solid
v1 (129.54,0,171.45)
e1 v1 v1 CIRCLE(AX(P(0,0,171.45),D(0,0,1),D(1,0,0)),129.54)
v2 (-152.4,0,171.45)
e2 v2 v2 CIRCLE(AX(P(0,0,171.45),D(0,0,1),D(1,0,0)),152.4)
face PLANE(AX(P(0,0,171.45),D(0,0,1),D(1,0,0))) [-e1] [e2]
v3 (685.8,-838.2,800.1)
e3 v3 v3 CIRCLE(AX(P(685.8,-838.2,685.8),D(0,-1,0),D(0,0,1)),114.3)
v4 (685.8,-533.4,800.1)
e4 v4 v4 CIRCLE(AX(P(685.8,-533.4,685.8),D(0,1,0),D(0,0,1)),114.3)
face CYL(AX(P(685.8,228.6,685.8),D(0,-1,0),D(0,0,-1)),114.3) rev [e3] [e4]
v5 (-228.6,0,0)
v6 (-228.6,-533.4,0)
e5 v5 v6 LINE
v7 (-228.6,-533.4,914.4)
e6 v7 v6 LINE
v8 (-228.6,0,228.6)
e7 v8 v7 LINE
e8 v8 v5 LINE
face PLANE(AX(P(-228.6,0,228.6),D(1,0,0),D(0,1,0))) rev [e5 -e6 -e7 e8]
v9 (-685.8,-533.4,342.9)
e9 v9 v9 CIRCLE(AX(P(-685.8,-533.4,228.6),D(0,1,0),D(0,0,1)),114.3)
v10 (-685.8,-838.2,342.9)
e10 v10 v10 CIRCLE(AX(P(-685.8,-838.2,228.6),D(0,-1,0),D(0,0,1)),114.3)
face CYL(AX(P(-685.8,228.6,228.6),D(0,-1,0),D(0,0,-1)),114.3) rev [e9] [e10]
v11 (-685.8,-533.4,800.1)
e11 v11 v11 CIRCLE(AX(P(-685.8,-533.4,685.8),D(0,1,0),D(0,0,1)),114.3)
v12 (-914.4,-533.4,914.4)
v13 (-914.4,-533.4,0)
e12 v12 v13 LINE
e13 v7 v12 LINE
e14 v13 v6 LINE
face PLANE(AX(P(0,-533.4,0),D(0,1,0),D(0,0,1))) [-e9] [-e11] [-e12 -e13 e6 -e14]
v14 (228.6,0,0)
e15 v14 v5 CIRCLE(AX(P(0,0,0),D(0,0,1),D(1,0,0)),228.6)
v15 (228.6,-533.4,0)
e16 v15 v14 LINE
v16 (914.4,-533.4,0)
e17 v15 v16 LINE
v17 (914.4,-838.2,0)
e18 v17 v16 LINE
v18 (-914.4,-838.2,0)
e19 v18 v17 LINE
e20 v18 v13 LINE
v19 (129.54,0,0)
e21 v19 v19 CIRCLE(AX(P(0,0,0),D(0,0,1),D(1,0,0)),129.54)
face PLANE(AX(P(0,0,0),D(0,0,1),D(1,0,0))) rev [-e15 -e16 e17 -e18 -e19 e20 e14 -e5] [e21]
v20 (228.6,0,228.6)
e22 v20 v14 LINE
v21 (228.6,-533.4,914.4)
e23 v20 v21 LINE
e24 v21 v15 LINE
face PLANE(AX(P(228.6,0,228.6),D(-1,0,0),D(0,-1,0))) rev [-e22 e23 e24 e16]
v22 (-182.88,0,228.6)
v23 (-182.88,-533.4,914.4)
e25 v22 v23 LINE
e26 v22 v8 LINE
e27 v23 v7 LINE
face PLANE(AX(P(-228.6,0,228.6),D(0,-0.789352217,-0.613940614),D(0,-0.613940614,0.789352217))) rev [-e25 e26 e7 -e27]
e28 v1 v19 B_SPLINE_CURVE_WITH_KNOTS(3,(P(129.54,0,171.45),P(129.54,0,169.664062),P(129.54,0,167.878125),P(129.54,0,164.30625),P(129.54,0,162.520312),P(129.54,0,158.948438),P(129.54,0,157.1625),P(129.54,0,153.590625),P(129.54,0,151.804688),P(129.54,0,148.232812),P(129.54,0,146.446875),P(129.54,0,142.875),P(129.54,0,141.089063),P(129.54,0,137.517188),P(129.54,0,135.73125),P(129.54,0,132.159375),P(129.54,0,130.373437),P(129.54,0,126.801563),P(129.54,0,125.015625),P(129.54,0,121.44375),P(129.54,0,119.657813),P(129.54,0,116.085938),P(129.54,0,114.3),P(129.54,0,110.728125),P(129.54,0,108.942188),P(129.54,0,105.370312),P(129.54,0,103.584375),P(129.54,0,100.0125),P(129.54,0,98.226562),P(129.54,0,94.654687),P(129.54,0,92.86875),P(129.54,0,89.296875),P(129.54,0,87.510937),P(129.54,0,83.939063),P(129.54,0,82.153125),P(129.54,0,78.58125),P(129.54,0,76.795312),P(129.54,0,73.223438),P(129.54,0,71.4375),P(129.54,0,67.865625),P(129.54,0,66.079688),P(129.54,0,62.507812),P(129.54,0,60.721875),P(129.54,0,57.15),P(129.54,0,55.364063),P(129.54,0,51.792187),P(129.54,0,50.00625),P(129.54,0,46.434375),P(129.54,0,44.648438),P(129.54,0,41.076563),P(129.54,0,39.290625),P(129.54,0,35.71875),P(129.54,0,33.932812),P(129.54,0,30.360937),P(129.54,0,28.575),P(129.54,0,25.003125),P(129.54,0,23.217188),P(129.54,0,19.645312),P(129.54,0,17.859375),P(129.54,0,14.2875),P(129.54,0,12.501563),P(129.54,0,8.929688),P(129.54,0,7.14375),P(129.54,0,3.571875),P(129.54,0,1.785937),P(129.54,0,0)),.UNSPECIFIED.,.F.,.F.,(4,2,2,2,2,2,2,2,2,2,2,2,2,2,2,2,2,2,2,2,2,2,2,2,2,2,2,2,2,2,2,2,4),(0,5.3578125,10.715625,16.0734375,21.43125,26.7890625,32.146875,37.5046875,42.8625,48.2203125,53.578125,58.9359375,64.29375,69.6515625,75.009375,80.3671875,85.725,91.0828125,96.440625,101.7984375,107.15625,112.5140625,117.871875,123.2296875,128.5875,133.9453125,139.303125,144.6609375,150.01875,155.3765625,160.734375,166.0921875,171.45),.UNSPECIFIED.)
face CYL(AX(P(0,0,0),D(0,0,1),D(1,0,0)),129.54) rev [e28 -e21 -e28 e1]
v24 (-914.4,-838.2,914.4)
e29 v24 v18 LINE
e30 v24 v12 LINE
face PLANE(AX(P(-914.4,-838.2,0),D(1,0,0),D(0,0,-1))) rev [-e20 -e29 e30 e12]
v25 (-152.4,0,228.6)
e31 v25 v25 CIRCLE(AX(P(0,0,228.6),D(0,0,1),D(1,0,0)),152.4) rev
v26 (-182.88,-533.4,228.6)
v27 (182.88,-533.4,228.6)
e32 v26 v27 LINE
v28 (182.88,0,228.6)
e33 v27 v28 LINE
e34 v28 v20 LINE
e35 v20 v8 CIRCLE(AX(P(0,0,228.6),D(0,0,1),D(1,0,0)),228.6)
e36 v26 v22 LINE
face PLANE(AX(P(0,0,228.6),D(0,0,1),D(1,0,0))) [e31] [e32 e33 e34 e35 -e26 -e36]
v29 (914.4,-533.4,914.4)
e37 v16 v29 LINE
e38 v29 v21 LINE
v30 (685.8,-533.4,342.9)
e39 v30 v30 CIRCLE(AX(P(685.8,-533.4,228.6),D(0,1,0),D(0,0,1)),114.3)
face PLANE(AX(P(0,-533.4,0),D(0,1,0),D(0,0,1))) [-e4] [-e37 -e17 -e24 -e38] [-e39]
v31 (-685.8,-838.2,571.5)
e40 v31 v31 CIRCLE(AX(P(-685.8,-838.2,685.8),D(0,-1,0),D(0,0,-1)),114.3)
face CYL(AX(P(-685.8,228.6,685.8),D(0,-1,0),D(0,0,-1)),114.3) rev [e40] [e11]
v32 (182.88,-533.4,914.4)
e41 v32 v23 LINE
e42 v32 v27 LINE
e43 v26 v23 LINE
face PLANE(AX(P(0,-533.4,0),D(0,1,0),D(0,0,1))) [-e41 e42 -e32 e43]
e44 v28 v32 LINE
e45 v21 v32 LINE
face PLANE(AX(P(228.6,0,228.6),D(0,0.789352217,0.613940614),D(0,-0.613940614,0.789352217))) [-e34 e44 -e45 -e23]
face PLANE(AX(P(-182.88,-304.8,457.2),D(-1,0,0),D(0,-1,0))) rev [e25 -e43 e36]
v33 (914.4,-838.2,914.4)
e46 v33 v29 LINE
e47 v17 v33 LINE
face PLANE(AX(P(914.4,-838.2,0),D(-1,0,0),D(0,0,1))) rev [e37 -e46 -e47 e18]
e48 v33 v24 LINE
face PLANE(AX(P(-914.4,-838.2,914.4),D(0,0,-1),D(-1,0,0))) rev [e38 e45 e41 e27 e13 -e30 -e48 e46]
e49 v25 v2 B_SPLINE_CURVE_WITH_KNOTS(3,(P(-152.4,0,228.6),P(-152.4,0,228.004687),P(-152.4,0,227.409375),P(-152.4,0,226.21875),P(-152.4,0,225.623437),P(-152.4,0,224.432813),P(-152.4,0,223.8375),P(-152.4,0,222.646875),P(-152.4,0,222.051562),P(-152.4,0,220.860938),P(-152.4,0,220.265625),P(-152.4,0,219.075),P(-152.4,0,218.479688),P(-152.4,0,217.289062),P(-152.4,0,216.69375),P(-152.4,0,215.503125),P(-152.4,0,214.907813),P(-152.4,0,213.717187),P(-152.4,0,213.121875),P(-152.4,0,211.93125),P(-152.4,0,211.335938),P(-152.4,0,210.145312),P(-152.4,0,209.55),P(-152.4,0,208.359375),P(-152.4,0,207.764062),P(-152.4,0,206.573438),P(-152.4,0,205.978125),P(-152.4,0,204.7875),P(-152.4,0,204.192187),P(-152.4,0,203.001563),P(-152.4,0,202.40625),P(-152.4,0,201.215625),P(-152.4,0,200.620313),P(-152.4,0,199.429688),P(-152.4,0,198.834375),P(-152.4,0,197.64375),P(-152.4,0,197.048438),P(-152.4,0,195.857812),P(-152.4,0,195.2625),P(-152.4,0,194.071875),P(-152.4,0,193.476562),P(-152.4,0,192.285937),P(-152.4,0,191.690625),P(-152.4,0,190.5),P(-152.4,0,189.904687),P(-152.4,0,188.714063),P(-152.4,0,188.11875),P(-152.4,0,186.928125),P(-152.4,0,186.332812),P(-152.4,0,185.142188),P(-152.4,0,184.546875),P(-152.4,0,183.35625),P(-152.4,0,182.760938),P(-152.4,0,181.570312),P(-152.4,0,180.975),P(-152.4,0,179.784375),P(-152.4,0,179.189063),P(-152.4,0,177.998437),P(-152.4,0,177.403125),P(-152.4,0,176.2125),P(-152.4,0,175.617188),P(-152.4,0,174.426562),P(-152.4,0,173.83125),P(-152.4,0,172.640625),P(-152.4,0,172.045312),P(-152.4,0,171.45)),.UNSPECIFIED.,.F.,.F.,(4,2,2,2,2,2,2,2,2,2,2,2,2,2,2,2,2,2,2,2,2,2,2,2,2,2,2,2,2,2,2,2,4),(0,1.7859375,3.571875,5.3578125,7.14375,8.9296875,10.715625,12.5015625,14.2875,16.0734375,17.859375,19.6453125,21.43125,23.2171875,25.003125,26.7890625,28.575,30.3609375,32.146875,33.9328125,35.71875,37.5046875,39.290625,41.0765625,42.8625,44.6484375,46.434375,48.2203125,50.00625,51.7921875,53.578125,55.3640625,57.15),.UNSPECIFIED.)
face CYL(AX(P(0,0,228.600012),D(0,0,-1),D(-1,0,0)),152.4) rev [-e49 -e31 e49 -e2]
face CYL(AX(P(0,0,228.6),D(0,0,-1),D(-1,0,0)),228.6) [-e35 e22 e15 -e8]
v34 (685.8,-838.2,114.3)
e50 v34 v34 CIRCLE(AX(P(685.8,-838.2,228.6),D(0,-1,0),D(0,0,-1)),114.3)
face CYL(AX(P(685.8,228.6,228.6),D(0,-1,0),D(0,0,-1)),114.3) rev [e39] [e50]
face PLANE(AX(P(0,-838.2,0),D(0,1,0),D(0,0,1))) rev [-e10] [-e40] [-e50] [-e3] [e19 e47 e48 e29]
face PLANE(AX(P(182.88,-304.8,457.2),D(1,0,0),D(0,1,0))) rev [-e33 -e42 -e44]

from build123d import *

# Parameters (mm, degrees)
EXTRUDE_1_DEPTH          = 228.6
CUT_EXTRUDE_1_DEPTH      = 624.723881217
CUT_EXTRUDE_1_DEPTH_BACK = 57.15
SKETCH_2_R               = 152.4
SKETCH_2_R_2             = 129.54
SKETCH_3_R               = 129.54
CUT_EXTRUDE_2_DEPTH      = 624.723881217
SKETCH_4_W               = 1828.8
SKETCH_4_H               = 914.4
EXTRUDE_2_DEPTH          = 304.8
RIB_START                = -45.72
RIB_11_DEPTH             = 45.72
SKETCH_6_R               = 114.3
CUT_EXTRUDE_3_DEPTH      = 1677.4


# Read off the part's stored shape, not the designer's step: 筋11
with BuildPart() as part:
    # 草图1 → 凸台-拉伸1 (new body)
    with BuildSketch(Plane.XY):
        with BuildLine():
            Line((-228.6, 0), (-228.6, -533.4))
            Line((-228.6, -533.4), (228.6, -533.4))
            Line((228.6, -533.4), (228.6, 0))
            ThreePointArc((228.6, 0), (0, 228.6), (-228.6, 0))
        make_face()
    extrude(amount=EXTRUDE_1_DEPTH)

    # 草图2 → 切除-拉伸1 (cut, two sides: drawn at the far end of the back side and taken through both)
    with BuildSketch(Plane.XY.offset(228.6).offset(-CUT_EXTRUDE_1_DEPTH_BACK)):
        with Locations(Location((0, 0, 0), (0, 0, 180))):
            Circle(SKETCH_2_R)
        with Locations(Location((0, 0, 0), (0, 0, 180))):
            Circle(SKETCH_2_R_2, mode=Mode.SUBTRACT)
    extrude(amount=CUT_EXTRUDE_1_DEPTH + CUT_EXTRUDE_1_DEPTH_BACK, mode=Mode.SUBTRACT)

    # 草图3 → 切除-拉伸2 (cut, through all)
    with BuildSketch(Plane.XY.offset(228.6)):
        Circle(SKETCH_3_R)
    extrude(amount=-CUT_EXTRUDE_2_DEPTH, mode=Mode.SUBTRACT)

    # 草图4 → 凸台-拉伸2 (add)
    with BuildSketch(Plane.XZ.offset(533.4)):
        with Locations((0, 457.2)):
            Rectangle(SKETCH_4_W, SKETCH_4_H)
    extrude(amount=EXTRUDE_2_DEPTH)

    # 筋11 outline → 筋11 (add)
    with BuildSketch(Plane(origin=(228.6, 0, 0), x_dir=(0, 0, -1), z_dir=(1, 0, 0)).offset(RIB_START)):
        Polygon((-228.6, -533.4), (-228.6, 0), (-914.4, -533.4), align=None)
    rib_11 = extrude(amount=RIB_11_DEPTH)

    # 镜向1: 筋11 across plane
    add(rib_11.mirror(Plane(origin=(0, 0, 0), x_dir=(0, 0, 1), z_dir=(1, 0, 0))))

    # 草图6 → 切除-拉伸3 (cut, through all)
    with BuildSketch(Plane.XZ.offset(838.2)):
        with Locations(Location((-685.8, 685.8, 0), (0, 0, 270))):
            Circle(SKETCH_6_R)
        with Locations(Location((-685.8, 228.6, 0), (0, 0, 90))):
            Circle(SKETCH_6_R)
        with Locations(Location((685.8, 228.6, 0), (0, 0, 270))):
            Circle(SKETCH_6_R)
        with Locations(Location((685.8, 685.8, 0), (0, 0, 90))):
            Circle(SKETCH_6_R)
    extrude(amount=-CUT_EXTRUDE_3_DEPTH, mode=Mode.SUBTRACT)


solid = part.part
